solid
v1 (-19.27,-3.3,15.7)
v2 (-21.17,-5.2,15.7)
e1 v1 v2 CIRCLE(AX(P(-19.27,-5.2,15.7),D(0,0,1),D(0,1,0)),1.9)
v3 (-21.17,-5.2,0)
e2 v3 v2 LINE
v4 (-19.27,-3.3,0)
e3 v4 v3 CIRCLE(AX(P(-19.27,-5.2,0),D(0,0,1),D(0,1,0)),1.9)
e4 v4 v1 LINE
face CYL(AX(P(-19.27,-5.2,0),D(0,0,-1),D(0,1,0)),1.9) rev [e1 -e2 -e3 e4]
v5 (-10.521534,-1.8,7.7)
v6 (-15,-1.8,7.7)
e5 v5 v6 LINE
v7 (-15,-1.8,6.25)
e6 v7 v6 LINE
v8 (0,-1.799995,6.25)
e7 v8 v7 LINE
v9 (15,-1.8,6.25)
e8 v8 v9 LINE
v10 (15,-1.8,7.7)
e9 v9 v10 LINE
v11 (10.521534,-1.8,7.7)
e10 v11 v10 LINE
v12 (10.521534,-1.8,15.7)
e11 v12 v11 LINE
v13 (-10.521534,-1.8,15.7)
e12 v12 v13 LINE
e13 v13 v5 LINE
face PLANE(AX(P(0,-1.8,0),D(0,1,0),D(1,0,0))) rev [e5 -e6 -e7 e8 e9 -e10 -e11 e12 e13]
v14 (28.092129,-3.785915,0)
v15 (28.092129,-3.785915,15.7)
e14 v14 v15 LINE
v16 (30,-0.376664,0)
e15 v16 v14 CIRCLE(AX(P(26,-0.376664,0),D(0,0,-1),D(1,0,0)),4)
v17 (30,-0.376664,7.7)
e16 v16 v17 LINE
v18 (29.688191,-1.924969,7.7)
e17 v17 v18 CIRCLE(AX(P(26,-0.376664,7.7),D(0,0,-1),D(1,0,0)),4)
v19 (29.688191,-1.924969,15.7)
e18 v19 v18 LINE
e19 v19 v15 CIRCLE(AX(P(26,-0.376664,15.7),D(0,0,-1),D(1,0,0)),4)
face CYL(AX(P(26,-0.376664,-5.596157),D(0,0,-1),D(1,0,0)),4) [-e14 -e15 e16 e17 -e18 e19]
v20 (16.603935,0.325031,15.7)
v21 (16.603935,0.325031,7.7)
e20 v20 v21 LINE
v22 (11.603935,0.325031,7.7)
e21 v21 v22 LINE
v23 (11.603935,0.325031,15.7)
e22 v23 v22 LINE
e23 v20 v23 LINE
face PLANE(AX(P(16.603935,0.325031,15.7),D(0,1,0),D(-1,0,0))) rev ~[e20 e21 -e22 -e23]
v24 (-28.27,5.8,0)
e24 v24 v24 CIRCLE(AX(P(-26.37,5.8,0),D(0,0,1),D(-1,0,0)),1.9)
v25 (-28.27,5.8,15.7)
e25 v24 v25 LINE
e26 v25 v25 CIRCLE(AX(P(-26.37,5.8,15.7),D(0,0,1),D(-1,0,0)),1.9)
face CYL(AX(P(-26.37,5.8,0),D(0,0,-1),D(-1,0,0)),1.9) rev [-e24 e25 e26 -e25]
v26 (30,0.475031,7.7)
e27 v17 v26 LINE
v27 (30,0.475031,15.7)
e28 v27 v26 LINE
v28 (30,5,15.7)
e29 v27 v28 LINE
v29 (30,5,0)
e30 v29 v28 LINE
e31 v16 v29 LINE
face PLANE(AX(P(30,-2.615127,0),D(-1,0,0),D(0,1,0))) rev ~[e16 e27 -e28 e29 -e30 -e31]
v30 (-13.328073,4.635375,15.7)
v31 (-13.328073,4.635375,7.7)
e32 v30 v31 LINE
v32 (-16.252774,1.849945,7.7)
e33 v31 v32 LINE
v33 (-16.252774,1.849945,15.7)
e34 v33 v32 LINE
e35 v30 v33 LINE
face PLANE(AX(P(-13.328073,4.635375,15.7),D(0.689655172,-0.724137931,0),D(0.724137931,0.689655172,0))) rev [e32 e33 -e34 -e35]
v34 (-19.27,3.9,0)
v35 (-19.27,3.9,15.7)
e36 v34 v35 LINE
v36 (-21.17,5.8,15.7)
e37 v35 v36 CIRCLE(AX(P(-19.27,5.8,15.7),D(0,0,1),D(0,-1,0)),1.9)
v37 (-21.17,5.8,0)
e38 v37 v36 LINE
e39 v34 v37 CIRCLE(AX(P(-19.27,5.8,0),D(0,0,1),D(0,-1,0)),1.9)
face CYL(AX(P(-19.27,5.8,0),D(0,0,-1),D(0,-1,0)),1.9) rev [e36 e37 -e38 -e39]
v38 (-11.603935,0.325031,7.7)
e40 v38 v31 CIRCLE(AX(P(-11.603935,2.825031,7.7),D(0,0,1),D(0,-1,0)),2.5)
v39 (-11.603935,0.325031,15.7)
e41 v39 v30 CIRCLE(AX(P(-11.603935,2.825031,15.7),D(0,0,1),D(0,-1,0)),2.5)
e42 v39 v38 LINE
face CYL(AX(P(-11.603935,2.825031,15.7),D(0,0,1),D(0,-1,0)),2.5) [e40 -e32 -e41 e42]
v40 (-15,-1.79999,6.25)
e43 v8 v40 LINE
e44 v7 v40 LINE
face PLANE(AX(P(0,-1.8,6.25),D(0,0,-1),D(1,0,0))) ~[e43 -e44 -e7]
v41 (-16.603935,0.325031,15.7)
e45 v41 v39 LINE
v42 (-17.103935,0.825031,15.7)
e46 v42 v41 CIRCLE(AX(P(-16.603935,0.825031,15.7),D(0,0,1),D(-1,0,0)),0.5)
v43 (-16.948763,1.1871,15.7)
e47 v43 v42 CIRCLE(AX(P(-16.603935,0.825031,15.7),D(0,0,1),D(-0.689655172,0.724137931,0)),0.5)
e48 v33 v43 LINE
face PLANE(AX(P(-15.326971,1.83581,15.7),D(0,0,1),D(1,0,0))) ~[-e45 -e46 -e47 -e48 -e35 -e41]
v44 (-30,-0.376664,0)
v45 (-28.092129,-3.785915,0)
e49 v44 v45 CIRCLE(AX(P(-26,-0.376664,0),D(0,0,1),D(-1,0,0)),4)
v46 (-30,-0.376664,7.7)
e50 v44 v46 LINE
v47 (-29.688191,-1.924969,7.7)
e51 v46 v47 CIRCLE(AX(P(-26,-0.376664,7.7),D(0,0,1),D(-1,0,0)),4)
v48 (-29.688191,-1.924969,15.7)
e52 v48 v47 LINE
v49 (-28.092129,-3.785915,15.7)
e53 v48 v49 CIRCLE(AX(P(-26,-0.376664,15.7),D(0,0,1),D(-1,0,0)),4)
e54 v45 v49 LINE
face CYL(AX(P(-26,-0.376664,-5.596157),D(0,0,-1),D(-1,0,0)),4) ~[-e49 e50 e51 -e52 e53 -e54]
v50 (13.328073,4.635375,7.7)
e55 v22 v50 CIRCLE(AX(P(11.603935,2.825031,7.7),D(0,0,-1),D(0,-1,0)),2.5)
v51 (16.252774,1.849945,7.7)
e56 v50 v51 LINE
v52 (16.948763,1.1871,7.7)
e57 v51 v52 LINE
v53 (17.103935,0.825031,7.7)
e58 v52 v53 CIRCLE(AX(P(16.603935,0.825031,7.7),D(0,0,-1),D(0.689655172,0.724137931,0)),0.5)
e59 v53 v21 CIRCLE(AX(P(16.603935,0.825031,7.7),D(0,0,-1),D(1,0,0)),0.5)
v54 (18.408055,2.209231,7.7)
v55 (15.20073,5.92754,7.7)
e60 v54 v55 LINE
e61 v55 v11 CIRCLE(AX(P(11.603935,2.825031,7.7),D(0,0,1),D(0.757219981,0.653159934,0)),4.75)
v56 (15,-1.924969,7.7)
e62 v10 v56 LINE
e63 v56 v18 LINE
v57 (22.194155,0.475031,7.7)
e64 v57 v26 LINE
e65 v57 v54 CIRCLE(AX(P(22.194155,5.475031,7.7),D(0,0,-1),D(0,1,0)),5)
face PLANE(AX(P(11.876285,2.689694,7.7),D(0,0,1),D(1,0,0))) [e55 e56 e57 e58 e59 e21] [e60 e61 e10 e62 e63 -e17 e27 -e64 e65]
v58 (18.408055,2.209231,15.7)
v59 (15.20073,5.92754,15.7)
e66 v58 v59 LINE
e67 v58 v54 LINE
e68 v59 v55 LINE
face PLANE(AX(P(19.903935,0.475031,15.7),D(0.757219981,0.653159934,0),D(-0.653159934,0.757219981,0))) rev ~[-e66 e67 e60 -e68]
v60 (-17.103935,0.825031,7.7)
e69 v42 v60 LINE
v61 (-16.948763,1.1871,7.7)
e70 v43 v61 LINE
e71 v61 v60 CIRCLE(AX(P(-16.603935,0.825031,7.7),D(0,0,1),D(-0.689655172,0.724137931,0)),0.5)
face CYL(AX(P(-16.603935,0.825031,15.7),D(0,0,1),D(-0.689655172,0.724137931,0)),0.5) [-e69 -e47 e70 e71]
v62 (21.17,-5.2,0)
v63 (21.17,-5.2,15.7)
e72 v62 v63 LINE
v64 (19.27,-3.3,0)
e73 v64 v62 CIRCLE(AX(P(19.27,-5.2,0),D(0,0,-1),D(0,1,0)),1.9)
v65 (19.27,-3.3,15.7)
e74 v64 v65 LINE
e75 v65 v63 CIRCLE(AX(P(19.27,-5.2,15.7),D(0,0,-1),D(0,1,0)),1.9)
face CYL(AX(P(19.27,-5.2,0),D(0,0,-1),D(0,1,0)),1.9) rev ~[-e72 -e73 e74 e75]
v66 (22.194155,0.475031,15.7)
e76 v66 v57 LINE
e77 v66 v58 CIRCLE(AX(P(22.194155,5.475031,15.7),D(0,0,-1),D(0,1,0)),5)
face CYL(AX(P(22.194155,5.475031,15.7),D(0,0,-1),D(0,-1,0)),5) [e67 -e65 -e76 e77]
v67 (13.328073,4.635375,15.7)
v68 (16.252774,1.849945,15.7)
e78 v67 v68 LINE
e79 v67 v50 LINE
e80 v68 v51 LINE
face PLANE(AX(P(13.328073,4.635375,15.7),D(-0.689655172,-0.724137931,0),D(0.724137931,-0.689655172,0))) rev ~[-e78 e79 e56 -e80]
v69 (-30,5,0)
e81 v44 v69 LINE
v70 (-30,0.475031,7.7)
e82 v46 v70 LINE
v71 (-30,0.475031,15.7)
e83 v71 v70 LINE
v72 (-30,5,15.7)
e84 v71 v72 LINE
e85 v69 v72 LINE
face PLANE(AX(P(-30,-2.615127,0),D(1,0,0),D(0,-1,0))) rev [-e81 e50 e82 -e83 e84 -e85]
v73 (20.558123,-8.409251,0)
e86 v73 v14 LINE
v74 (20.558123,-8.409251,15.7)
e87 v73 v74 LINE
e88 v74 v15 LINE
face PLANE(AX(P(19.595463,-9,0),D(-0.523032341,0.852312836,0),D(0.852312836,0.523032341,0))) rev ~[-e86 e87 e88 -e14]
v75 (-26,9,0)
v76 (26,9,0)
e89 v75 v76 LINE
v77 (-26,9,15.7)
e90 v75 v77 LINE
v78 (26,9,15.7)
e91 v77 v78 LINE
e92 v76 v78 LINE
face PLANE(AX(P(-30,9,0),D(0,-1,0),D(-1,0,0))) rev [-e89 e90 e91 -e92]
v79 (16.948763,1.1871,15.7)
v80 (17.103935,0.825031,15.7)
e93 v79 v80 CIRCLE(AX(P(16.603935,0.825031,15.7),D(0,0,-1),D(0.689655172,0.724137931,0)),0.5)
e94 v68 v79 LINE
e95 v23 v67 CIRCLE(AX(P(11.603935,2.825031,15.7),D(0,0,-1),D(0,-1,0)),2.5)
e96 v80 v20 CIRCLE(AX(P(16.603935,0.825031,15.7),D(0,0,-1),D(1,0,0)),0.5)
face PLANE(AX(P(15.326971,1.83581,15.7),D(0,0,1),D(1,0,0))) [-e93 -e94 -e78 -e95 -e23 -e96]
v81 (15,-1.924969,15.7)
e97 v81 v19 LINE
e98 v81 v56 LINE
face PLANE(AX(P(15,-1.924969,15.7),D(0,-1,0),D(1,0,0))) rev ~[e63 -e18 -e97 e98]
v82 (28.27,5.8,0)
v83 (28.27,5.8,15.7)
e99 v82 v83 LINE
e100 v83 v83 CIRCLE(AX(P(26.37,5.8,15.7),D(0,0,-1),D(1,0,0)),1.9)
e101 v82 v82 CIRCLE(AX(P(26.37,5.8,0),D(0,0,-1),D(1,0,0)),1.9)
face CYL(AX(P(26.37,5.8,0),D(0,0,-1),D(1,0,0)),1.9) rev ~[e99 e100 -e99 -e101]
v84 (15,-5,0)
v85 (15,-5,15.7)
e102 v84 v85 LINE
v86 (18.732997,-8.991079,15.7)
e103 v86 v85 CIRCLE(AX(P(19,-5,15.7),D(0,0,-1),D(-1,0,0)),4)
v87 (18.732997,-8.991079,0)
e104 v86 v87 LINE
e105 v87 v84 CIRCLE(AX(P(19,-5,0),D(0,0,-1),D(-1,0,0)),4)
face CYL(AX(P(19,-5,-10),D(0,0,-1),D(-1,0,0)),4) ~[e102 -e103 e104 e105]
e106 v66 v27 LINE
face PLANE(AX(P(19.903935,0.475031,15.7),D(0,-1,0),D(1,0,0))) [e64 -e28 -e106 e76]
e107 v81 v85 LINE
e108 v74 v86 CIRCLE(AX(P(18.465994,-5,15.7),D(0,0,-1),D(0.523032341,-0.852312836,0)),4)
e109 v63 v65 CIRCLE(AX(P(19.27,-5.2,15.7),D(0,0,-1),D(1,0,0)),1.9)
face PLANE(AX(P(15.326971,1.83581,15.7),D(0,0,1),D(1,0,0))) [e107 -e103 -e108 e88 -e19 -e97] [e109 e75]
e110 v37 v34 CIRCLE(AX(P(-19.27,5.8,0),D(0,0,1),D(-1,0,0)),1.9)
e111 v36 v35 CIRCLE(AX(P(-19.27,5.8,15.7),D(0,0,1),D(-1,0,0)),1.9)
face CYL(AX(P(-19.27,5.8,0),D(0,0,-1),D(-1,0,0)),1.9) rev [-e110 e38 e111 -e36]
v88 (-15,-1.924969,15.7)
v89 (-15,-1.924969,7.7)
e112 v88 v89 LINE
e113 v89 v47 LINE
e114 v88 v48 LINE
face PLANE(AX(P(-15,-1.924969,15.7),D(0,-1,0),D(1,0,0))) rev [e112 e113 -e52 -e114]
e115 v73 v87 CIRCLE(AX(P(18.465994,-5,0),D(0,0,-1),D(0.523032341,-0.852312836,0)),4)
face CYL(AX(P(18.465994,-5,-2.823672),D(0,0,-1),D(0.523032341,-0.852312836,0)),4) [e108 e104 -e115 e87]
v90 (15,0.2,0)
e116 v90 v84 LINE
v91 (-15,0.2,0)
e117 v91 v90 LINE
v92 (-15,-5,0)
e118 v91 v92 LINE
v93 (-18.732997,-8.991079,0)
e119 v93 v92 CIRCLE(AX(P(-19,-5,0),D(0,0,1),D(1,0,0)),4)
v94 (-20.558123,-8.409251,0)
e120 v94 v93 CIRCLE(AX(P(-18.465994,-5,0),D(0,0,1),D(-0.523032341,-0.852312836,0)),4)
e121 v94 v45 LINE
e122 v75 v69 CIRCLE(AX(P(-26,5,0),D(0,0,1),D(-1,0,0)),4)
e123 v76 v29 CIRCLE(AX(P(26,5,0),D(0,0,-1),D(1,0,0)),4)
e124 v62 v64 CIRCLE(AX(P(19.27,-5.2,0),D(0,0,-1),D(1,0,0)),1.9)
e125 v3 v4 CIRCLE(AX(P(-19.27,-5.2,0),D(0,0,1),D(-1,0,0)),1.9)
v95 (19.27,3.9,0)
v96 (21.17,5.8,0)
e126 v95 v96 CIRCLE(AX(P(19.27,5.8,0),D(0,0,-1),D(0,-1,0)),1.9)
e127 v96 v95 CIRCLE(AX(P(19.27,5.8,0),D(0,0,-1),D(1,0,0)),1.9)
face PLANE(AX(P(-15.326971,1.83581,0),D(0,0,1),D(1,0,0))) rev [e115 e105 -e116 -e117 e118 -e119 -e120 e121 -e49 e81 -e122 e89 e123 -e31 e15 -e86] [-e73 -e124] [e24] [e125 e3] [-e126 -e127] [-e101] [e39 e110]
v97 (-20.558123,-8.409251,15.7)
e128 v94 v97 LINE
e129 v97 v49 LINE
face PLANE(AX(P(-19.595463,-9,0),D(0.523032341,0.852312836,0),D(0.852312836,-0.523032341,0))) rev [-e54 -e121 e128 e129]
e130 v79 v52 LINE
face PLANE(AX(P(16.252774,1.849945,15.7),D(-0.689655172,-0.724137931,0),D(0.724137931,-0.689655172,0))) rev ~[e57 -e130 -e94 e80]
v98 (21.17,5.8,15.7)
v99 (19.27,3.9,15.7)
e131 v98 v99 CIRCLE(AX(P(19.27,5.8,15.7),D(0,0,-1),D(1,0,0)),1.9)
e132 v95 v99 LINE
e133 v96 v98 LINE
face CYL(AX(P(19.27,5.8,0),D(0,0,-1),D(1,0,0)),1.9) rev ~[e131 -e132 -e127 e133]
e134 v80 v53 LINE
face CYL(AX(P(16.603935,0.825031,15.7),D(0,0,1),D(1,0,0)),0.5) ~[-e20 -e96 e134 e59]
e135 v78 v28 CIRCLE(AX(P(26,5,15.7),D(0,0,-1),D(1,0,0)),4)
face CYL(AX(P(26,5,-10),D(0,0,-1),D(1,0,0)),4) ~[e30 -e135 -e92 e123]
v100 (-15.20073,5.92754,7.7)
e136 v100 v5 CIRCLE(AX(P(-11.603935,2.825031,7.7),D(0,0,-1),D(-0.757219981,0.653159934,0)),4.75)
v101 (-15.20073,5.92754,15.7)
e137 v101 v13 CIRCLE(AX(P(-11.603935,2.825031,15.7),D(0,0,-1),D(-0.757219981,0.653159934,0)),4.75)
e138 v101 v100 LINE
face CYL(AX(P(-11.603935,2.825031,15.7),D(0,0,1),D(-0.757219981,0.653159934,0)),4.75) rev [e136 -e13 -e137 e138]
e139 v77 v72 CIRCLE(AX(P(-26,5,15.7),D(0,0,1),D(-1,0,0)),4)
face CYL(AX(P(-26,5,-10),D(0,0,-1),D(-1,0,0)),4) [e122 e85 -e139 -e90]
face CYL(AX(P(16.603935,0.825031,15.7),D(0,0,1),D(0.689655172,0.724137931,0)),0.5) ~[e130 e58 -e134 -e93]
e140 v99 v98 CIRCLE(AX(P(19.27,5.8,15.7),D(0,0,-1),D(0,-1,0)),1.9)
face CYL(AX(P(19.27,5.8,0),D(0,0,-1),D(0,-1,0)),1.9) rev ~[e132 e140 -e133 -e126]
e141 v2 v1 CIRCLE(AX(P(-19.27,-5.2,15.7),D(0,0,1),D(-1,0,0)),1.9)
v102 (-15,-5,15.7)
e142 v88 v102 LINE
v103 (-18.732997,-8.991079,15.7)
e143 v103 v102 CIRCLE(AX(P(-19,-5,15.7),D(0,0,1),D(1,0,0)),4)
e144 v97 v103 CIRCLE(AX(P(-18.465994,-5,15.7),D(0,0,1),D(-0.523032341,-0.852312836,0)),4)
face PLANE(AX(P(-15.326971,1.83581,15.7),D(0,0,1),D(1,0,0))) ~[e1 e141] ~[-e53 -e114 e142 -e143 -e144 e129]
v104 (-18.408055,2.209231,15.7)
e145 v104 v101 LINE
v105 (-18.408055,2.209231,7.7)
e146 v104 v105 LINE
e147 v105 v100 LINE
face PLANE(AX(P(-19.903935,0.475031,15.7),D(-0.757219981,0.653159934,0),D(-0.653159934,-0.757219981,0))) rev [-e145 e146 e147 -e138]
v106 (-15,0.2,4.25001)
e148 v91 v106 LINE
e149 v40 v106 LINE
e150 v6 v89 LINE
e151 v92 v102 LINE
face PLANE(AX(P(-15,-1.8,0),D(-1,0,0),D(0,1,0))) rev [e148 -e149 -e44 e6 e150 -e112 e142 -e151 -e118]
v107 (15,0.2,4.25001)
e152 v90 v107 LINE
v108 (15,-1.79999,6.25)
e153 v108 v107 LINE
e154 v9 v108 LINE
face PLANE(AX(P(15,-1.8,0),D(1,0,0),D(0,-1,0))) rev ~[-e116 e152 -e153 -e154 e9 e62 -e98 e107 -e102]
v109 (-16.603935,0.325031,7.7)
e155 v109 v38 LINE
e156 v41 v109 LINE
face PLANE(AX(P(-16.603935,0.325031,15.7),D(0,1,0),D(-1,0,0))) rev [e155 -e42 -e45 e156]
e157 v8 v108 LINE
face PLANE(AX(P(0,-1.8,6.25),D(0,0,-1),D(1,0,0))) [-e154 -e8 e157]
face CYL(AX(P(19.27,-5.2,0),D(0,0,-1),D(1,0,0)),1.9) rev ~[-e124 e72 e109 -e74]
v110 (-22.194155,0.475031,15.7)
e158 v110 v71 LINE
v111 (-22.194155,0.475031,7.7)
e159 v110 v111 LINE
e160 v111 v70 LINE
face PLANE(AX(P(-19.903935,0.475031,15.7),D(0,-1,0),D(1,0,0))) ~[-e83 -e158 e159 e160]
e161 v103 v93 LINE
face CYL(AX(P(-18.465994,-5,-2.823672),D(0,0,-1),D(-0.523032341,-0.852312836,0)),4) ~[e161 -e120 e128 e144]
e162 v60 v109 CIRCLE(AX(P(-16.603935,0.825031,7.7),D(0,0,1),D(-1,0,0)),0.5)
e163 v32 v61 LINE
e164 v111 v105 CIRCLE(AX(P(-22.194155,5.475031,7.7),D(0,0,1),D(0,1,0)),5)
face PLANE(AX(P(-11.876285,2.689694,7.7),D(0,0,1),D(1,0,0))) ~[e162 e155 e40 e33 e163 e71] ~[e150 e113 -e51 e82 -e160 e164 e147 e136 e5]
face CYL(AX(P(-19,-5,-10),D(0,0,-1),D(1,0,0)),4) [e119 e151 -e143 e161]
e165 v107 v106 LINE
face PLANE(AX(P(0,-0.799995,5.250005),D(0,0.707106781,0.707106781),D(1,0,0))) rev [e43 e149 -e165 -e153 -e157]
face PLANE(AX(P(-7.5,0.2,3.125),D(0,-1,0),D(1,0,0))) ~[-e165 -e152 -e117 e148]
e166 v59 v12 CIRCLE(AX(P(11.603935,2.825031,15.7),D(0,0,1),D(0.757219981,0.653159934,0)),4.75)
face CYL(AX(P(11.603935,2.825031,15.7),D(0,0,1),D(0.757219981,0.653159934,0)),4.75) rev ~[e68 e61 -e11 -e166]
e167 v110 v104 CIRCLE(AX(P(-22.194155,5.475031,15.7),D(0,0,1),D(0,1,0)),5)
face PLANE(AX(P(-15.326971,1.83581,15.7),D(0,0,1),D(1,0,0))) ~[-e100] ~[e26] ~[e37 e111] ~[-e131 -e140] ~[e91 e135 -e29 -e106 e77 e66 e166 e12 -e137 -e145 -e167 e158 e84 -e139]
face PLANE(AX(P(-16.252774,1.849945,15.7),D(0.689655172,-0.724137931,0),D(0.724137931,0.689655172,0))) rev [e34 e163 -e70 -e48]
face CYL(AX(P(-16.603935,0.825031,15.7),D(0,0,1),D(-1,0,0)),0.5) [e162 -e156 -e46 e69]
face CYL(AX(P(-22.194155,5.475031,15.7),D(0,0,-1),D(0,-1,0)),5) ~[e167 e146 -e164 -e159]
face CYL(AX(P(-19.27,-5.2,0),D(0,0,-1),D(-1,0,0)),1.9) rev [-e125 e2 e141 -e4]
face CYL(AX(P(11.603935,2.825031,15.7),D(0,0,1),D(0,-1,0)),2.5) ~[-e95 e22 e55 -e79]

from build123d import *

# Parameters (mm, degrees)
F1_DEPTH    = 15.7
F2_W        = 10.0960650777
F2_H        = 2.4
F3_DEPTH    = 8
F4_R        = 5
F5_T1_DEPTH = 26.8923143391
F5_T3_DEPTH = 21.3473434867
F5_T5_DEPTH = 35.7
F6_W        = 15
F6_H        = 6.25
F7_DEPTH    = 2
F8_SIZE     = 1.99999


# Not quite as in the source:
# - a fillet or chamfer that OpenCascade refuses, or shapes differently, is made with other operations: its cross-section is extruded or revolved along the edge and cut away or added
# - a fillet or chamfer is up to 0.001 mm smaller than in the source, because OpenCascade refuses the exact size


with BuildPart() as f1:
    # F0 (on Top) → F1 (new body)
    with BuildSketch(Plane.XY):
        Polygon((30, 9), (0, 9), (0, -1.8), (15, -1.8), (15, -9), (19.5954625243, -9), (30, -2.6151265483), align=None)
        with BuildLine():
            ThreePointArc((21.17, -5.2), (17.9264971157, -6.5435028843), (19.27, -3.3))
            ThreePointArc((19.27, -3.3), (20.6135028843, -3.8564971157), (21.17, -5.2))
        make_face(mode=Mode.SUBTRACT)
        with BuildLine():
            ThreePointArc((19.27, 3.9), (17.9264971157, 7.1435028843), (21.17, 5.8))
            ThreePointArc((21.17, 5.8), (20.6135028843, 4.4564971157), (19.27, 3.9))
        make_face(mode=Mode.SUBTRACT)
        with BuildLine():
            ThreePointArc((24.47, 5.8), (26.37, 7.7), (28.27, 5.8))
            ThreePointArc((28.27, 5.8), (26.37, 3.9), (24.47, 5.8))
        make_face(mode=Mode.SUBTRACT)
    extrude(amount=F1_DEPTH)

    # F2 (on face) → F3 (cut)
    with BuildSketch(Plane.XY.offset(15.7)):
        with BuildLine():
            ThreePointArc((11.6039349223, 0.3250306588), (9.2827431951, 3.7535073497), (13.3280728534, 4.6353754864))
            Line((13.3280728534, 4.6353754864), (16.2527744297, 1.8499454137))
            ThreePointArc((16.2527744297, 1.8499454137), (16.328577113, 2.3348713274), (16.3539349223, 2.8250306588))
            ThreePointArc((16.3539349223, 2.8250306588), (16.0563093355, 4.479981439), (15.200729834, 5.9275403467))
            ThreePointArc((15.200729834, 5.9275403467), (7.5407755063, 5.2853630672), (10.5215341623, -1.8))
            Line((10.5215341623, -1.8), (12.6863356823, -1.8))
            ThreePointArc((12.6863356823, -1.8), (14.376262754, -1.0320016711), (15.6428085277, 0.3250306588))
            Line((15.6428085277, 0.3250306588), (11.6039349223, 0.3250306588))
        make_face()
        with BuildLine():
            ThreePointArc((16.3539349223, 2.8250306588), (16.328577113, 2.3348713274), (16.2527744297, 1.8499454137))
            Line((16.2527744297, 1.8499454137), (16.9487625085, 1.1870996243))
            ThreePointArc((16.9487625085, 1.1870996243), (17.0635074373, 1.0219903081), (17.1039349223, 0.8250306588))
            ThreePointArc((17.1039349223, 0.8250306588), (16.9574883129, 0.4714772682), (16.6039349223, 0.3250306588))
            Line((16.6039349223, 0.3250306588), (15.6428085277, 0.3250306588))
            ThreePointArc((15.6428085277, 0.3250306588), (14.376262754, -1.0320016711), (12.6863356823, -1.8))
            Line((12.6863356823, -1.8), (15, -1.8))
            Line((15, -1.8), (15, -1.9249693412))
            Line((15, -1.9249693412), (19.9039349223, -1.9249693412))
            Line((19.9039349223, -1.9249693412), (19.9039349223, 0.4750306588))
            Line((19.9039349223, 0.4750306588), (15.200729834, 5.9275403467))
            ThreePointArc((15.200729834, 5.9275403467), (16.0563093355, 4.479981439), (16.3539349223, 2.8250306588))
        make_face()
        with Locations((24.9519674612, -0.7249693412)):
            Rectangle(F2_W, F2_H)
    extrude(amount=-F3_DEPTH, mode=Mode.SUBTRACT)

    # F4
    f4_edges = [f1.edges().sort_by_distance(p)[0] for p in [
        (19.903935, 0.475031, 11.7),
    ]]
    fillet(f4_edges, radius=F4_R)

    # F5: fillet of radius 4 on 4 edges, made by hand

    # F5_s2 → F5_t1 (cut)
    with BuildSketch(Plane.XY.offset(-5.5961571696)):
        with BuildLine():
            ThreePointArc((30, -0.3766636805), (29.4905957559, -2.3300559271), (28.0921293656, -3.7859150232))
            Line((28.0921293656, -3.7859150232), (30, -2.6151265483))
            Line((30, -2.6151265483), (30, -0.3766636805))
        make_face()
    extrude(amount=F5_T1_DEPTH, mode=Mode.SUBTRACT)

    # F5_s4 → F5_t3 (cut)
    with BuildSketch(Plane.XY.offset(-2.8236717433)):
        with BuildLine():
            ThreePointArc((20.5581231925, -8.4092513427), (19.5529608525, -8.8494808332), (18.465993827, -9))
            Line((18.465993827, -9), (19.5954625243, -9))
            Line((19.5954625243, -9), (20.5581231925, -8.4092513427))
        make_face()
    extrude(amount=F5_T3_DEPTH, mode=Mode.SUBTRACT)

    # F5_s6 → F5_t5 (cut)
    with BuildSketch(Plane.XY.offset(-10)):
        with BuildLine():
            ThreePointArc((15, -5), (16.1715728753, -7.8284271247), (19, -9))
            Line((19, -9), (15, -9))
            Line((15, -9), (15, -5))
        make_face()
        with BuildLine():
            ThreePointArc((30, 5), (28.8284271247, 7.8284271247), (26, 9))
            Line((26, 9), (30, 9))
            Line((30, 9), (30, 5))
        make_face()
    extrude(amount=F5_T5_DEPTH, mode=Mode.SUBTRACT)

    # F6 (on face) → F7 (cut)
    with BuildSketch(Plane.XZ.offset(1.8)):
        with Locations((7.5, 3.125)):
            Rectangle(F6_W, F6_H)
    extrude(amount=-F7_DEPTH, mode=Mode.SUBTRACT)

    # F8 (size 2 in the source; OpenCascade refuses exactly that, so slightly less here)
    f8_edges = [f1.edges().sort_by_distance(p)[0] for p in [
        (7.5, 0.2, 6.25),
    ]]
    chamfer(f8_edges, length=F8_SIZE)

    # F9: F1 across plane


with BuildPart() as f1_1:
    add(f1.part)
    add(f1.part.mirror(Plane.YZ))


solid = f1_1.part
